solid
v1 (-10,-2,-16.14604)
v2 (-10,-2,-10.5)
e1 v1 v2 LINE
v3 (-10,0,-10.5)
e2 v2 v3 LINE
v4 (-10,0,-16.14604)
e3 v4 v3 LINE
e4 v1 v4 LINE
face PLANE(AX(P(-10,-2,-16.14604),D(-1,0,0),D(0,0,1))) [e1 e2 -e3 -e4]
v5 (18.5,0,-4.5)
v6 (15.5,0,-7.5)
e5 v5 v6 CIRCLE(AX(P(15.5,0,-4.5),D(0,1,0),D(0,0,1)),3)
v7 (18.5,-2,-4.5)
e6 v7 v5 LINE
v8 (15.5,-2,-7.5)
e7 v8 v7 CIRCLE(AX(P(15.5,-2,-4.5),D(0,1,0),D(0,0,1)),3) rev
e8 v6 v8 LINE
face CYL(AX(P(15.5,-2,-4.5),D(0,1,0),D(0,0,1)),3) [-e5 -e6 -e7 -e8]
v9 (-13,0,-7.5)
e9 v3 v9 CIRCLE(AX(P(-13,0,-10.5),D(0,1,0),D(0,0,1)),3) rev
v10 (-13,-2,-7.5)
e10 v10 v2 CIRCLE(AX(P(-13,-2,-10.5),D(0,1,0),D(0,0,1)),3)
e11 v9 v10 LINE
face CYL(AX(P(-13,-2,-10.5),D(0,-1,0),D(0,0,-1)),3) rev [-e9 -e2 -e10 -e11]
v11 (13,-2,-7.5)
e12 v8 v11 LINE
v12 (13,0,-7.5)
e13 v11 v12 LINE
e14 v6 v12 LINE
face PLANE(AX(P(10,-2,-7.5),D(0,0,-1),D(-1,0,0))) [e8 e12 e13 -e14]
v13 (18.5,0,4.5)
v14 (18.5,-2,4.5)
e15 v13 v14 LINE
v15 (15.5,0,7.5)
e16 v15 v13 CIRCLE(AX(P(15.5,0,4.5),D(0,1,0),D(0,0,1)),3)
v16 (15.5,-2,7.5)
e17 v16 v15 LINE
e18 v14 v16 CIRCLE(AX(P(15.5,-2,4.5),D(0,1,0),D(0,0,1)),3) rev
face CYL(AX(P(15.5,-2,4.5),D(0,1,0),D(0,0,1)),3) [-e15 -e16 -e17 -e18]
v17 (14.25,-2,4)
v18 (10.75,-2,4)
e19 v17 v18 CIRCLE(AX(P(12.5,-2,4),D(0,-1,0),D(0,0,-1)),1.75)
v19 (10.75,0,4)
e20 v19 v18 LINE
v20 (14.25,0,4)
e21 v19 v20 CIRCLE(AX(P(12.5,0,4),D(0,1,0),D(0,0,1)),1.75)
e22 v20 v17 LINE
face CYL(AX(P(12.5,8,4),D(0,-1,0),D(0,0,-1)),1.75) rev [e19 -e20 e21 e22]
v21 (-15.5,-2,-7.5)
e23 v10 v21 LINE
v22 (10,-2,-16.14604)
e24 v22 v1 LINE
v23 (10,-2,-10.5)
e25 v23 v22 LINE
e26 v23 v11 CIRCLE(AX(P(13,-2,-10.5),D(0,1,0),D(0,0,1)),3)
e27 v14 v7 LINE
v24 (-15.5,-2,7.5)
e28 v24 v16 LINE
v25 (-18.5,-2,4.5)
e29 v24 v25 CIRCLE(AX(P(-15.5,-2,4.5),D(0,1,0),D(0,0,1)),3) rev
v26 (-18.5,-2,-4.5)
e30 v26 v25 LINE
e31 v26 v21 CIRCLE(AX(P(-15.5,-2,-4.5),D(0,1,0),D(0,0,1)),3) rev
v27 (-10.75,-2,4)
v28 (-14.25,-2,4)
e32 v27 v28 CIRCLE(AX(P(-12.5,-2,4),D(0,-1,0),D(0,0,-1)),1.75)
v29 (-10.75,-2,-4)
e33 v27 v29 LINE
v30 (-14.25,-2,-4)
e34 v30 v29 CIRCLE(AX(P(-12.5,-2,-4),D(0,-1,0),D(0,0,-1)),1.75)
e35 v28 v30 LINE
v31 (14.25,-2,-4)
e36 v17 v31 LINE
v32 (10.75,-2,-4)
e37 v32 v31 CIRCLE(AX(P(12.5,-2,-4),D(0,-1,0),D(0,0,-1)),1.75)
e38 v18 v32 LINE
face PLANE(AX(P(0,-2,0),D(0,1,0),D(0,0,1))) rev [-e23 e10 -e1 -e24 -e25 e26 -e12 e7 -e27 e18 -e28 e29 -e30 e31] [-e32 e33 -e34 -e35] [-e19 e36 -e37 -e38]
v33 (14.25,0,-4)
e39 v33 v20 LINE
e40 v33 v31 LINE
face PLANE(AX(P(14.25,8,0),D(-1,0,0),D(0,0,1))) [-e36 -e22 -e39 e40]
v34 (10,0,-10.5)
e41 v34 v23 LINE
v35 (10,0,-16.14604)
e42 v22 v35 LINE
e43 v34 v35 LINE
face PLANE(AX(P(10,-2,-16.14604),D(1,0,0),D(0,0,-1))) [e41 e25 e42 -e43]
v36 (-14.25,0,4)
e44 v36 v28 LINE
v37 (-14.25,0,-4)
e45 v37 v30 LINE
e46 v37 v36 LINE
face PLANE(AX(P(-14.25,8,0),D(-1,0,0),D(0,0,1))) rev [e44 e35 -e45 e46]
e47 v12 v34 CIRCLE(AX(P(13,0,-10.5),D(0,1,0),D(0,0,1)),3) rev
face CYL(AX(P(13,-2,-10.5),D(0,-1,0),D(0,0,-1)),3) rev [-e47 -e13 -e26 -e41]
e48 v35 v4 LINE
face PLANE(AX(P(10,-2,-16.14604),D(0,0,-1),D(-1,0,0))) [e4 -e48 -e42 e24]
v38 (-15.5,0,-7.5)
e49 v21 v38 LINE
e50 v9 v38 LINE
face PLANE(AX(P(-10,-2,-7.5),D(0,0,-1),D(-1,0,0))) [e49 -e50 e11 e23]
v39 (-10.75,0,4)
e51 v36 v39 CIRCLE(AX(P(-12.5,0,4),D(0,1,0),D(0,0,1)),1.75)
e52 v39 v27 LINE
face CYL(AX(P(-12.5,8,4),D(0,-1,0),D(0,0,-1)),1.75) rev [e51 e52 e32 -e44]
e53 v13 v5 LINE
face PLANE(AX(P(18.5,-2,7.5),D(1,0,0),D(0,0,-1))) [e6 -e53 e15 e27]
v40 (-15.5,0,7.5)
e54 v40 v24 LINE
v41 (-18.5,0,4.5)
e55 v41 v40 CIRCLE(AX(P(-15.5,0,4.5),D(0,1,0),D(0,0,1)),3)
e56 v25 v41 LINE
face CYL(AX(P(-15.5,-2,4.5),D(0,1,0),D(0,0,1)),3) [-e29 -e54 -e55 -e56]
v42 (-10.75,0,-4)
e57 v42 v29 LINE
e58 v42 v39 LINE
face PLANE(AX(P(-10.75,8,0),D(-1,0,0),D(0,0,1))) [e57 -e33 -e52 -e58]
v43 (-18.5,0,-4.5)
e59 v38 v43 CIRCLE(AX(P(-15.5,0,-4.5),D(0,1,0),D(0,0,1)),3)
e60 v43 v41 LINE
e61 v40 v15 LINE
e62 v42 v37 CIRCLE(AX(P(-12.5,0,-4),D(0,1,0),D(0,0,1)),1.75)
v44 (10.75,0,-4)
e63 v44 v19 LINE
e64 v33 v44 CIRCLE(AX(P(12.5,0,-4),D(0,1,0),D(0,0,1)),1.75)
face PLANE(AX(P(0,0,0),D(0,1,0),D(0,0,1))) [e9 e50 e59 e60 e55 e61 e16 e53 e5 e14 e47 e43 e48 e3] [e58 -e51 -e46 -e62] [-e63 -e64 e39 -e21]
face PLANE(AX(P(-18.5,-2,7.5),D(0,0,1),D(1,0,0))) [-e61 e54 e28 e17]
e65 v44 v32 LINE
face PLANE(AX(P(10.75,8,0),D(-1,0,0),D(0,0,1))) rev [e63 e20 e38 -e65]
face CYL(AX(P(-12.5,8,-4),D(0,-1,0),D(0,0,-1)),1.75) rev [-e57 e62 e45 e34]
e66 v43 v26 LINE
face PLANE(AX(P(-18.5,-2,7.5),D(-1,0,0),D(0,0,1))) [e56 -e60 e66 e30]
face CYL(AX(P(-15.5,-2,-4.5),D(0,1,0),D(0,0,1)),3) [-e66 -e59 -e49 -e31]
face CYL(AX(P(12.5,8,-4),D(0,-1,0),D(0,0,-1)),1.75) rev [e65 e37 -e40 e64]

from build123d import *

# Parameters (mm, degrees)
SM_BASE_FLANGE_1_DEPTH = 2
FILLET_1_R             = 3
CUT_EXTRUDE_1_DEPTH    = 10


# Sheet-metal steps are written as plain solids
with BuildPart() as part:
    # Sketch 1 → 基体-法兰1 (new body)
    with BuildSketch(Plane(origin=(0, 0, 0), x_dir=(1, 0, 0), z_dir=(0, 1, 0))):
        Polygon((-10, 7.5), (-18.5, 7.5), (-18.5, -7.5), (18.5, -7.5), (18.5, 7.5), (10, 7.5), (10, 16.146039932), (-10, 16.146039932), align=None)
    extrude(amount=-SM_BASE_FLANGE_1_DEPTH)

    # 圆角1
    fillet_1_edges = [part.edges().sort_by_distance(p)[0] for p in [
        (18.5, -1, -7.5),
        (18.5, -1, 7.5),
        (-18.5, -1, 7.5),
        (-18.5, -1, -7.5),
        (-10, -1, -7.5),
        (10, -1, -7.5),
    ]]
    fillet(fillet_1_edges, radius=FILLET_1_R)

    # 草图6 → 切除-拉伸1 (cut)
    with BuildSketch(Plane.XZ.offset(2)):
        with BuildLine():
            Line((-10.75, 4), (-10.75, -4))
            ThreePointArc((-10.75, -4), (-12.5, -5.75), (-14.25, -4))
            Line((-14.25, -4), (-14.25, 4))
            ThreePointArc((-14.25, 4), (-12.5, 5.75), (-10.75, 4))
        make_face()
        with BuildLine():
            Line((14.25, 4), (14.25, -4))
            ThreePointArc((14.25, -4), (12.5, -5.75), (10.75, -4))
            Line((10.75, -4), (10.75, 4))
            ThreePointArc((10.75, 4), (12.5, 5.75), (14.25, 4))
        make_face()
    extrude(amount=-CUT_EXTRUDE_1_DEPTH, mode=Mode.SUBTRACT)


solid = part.part
